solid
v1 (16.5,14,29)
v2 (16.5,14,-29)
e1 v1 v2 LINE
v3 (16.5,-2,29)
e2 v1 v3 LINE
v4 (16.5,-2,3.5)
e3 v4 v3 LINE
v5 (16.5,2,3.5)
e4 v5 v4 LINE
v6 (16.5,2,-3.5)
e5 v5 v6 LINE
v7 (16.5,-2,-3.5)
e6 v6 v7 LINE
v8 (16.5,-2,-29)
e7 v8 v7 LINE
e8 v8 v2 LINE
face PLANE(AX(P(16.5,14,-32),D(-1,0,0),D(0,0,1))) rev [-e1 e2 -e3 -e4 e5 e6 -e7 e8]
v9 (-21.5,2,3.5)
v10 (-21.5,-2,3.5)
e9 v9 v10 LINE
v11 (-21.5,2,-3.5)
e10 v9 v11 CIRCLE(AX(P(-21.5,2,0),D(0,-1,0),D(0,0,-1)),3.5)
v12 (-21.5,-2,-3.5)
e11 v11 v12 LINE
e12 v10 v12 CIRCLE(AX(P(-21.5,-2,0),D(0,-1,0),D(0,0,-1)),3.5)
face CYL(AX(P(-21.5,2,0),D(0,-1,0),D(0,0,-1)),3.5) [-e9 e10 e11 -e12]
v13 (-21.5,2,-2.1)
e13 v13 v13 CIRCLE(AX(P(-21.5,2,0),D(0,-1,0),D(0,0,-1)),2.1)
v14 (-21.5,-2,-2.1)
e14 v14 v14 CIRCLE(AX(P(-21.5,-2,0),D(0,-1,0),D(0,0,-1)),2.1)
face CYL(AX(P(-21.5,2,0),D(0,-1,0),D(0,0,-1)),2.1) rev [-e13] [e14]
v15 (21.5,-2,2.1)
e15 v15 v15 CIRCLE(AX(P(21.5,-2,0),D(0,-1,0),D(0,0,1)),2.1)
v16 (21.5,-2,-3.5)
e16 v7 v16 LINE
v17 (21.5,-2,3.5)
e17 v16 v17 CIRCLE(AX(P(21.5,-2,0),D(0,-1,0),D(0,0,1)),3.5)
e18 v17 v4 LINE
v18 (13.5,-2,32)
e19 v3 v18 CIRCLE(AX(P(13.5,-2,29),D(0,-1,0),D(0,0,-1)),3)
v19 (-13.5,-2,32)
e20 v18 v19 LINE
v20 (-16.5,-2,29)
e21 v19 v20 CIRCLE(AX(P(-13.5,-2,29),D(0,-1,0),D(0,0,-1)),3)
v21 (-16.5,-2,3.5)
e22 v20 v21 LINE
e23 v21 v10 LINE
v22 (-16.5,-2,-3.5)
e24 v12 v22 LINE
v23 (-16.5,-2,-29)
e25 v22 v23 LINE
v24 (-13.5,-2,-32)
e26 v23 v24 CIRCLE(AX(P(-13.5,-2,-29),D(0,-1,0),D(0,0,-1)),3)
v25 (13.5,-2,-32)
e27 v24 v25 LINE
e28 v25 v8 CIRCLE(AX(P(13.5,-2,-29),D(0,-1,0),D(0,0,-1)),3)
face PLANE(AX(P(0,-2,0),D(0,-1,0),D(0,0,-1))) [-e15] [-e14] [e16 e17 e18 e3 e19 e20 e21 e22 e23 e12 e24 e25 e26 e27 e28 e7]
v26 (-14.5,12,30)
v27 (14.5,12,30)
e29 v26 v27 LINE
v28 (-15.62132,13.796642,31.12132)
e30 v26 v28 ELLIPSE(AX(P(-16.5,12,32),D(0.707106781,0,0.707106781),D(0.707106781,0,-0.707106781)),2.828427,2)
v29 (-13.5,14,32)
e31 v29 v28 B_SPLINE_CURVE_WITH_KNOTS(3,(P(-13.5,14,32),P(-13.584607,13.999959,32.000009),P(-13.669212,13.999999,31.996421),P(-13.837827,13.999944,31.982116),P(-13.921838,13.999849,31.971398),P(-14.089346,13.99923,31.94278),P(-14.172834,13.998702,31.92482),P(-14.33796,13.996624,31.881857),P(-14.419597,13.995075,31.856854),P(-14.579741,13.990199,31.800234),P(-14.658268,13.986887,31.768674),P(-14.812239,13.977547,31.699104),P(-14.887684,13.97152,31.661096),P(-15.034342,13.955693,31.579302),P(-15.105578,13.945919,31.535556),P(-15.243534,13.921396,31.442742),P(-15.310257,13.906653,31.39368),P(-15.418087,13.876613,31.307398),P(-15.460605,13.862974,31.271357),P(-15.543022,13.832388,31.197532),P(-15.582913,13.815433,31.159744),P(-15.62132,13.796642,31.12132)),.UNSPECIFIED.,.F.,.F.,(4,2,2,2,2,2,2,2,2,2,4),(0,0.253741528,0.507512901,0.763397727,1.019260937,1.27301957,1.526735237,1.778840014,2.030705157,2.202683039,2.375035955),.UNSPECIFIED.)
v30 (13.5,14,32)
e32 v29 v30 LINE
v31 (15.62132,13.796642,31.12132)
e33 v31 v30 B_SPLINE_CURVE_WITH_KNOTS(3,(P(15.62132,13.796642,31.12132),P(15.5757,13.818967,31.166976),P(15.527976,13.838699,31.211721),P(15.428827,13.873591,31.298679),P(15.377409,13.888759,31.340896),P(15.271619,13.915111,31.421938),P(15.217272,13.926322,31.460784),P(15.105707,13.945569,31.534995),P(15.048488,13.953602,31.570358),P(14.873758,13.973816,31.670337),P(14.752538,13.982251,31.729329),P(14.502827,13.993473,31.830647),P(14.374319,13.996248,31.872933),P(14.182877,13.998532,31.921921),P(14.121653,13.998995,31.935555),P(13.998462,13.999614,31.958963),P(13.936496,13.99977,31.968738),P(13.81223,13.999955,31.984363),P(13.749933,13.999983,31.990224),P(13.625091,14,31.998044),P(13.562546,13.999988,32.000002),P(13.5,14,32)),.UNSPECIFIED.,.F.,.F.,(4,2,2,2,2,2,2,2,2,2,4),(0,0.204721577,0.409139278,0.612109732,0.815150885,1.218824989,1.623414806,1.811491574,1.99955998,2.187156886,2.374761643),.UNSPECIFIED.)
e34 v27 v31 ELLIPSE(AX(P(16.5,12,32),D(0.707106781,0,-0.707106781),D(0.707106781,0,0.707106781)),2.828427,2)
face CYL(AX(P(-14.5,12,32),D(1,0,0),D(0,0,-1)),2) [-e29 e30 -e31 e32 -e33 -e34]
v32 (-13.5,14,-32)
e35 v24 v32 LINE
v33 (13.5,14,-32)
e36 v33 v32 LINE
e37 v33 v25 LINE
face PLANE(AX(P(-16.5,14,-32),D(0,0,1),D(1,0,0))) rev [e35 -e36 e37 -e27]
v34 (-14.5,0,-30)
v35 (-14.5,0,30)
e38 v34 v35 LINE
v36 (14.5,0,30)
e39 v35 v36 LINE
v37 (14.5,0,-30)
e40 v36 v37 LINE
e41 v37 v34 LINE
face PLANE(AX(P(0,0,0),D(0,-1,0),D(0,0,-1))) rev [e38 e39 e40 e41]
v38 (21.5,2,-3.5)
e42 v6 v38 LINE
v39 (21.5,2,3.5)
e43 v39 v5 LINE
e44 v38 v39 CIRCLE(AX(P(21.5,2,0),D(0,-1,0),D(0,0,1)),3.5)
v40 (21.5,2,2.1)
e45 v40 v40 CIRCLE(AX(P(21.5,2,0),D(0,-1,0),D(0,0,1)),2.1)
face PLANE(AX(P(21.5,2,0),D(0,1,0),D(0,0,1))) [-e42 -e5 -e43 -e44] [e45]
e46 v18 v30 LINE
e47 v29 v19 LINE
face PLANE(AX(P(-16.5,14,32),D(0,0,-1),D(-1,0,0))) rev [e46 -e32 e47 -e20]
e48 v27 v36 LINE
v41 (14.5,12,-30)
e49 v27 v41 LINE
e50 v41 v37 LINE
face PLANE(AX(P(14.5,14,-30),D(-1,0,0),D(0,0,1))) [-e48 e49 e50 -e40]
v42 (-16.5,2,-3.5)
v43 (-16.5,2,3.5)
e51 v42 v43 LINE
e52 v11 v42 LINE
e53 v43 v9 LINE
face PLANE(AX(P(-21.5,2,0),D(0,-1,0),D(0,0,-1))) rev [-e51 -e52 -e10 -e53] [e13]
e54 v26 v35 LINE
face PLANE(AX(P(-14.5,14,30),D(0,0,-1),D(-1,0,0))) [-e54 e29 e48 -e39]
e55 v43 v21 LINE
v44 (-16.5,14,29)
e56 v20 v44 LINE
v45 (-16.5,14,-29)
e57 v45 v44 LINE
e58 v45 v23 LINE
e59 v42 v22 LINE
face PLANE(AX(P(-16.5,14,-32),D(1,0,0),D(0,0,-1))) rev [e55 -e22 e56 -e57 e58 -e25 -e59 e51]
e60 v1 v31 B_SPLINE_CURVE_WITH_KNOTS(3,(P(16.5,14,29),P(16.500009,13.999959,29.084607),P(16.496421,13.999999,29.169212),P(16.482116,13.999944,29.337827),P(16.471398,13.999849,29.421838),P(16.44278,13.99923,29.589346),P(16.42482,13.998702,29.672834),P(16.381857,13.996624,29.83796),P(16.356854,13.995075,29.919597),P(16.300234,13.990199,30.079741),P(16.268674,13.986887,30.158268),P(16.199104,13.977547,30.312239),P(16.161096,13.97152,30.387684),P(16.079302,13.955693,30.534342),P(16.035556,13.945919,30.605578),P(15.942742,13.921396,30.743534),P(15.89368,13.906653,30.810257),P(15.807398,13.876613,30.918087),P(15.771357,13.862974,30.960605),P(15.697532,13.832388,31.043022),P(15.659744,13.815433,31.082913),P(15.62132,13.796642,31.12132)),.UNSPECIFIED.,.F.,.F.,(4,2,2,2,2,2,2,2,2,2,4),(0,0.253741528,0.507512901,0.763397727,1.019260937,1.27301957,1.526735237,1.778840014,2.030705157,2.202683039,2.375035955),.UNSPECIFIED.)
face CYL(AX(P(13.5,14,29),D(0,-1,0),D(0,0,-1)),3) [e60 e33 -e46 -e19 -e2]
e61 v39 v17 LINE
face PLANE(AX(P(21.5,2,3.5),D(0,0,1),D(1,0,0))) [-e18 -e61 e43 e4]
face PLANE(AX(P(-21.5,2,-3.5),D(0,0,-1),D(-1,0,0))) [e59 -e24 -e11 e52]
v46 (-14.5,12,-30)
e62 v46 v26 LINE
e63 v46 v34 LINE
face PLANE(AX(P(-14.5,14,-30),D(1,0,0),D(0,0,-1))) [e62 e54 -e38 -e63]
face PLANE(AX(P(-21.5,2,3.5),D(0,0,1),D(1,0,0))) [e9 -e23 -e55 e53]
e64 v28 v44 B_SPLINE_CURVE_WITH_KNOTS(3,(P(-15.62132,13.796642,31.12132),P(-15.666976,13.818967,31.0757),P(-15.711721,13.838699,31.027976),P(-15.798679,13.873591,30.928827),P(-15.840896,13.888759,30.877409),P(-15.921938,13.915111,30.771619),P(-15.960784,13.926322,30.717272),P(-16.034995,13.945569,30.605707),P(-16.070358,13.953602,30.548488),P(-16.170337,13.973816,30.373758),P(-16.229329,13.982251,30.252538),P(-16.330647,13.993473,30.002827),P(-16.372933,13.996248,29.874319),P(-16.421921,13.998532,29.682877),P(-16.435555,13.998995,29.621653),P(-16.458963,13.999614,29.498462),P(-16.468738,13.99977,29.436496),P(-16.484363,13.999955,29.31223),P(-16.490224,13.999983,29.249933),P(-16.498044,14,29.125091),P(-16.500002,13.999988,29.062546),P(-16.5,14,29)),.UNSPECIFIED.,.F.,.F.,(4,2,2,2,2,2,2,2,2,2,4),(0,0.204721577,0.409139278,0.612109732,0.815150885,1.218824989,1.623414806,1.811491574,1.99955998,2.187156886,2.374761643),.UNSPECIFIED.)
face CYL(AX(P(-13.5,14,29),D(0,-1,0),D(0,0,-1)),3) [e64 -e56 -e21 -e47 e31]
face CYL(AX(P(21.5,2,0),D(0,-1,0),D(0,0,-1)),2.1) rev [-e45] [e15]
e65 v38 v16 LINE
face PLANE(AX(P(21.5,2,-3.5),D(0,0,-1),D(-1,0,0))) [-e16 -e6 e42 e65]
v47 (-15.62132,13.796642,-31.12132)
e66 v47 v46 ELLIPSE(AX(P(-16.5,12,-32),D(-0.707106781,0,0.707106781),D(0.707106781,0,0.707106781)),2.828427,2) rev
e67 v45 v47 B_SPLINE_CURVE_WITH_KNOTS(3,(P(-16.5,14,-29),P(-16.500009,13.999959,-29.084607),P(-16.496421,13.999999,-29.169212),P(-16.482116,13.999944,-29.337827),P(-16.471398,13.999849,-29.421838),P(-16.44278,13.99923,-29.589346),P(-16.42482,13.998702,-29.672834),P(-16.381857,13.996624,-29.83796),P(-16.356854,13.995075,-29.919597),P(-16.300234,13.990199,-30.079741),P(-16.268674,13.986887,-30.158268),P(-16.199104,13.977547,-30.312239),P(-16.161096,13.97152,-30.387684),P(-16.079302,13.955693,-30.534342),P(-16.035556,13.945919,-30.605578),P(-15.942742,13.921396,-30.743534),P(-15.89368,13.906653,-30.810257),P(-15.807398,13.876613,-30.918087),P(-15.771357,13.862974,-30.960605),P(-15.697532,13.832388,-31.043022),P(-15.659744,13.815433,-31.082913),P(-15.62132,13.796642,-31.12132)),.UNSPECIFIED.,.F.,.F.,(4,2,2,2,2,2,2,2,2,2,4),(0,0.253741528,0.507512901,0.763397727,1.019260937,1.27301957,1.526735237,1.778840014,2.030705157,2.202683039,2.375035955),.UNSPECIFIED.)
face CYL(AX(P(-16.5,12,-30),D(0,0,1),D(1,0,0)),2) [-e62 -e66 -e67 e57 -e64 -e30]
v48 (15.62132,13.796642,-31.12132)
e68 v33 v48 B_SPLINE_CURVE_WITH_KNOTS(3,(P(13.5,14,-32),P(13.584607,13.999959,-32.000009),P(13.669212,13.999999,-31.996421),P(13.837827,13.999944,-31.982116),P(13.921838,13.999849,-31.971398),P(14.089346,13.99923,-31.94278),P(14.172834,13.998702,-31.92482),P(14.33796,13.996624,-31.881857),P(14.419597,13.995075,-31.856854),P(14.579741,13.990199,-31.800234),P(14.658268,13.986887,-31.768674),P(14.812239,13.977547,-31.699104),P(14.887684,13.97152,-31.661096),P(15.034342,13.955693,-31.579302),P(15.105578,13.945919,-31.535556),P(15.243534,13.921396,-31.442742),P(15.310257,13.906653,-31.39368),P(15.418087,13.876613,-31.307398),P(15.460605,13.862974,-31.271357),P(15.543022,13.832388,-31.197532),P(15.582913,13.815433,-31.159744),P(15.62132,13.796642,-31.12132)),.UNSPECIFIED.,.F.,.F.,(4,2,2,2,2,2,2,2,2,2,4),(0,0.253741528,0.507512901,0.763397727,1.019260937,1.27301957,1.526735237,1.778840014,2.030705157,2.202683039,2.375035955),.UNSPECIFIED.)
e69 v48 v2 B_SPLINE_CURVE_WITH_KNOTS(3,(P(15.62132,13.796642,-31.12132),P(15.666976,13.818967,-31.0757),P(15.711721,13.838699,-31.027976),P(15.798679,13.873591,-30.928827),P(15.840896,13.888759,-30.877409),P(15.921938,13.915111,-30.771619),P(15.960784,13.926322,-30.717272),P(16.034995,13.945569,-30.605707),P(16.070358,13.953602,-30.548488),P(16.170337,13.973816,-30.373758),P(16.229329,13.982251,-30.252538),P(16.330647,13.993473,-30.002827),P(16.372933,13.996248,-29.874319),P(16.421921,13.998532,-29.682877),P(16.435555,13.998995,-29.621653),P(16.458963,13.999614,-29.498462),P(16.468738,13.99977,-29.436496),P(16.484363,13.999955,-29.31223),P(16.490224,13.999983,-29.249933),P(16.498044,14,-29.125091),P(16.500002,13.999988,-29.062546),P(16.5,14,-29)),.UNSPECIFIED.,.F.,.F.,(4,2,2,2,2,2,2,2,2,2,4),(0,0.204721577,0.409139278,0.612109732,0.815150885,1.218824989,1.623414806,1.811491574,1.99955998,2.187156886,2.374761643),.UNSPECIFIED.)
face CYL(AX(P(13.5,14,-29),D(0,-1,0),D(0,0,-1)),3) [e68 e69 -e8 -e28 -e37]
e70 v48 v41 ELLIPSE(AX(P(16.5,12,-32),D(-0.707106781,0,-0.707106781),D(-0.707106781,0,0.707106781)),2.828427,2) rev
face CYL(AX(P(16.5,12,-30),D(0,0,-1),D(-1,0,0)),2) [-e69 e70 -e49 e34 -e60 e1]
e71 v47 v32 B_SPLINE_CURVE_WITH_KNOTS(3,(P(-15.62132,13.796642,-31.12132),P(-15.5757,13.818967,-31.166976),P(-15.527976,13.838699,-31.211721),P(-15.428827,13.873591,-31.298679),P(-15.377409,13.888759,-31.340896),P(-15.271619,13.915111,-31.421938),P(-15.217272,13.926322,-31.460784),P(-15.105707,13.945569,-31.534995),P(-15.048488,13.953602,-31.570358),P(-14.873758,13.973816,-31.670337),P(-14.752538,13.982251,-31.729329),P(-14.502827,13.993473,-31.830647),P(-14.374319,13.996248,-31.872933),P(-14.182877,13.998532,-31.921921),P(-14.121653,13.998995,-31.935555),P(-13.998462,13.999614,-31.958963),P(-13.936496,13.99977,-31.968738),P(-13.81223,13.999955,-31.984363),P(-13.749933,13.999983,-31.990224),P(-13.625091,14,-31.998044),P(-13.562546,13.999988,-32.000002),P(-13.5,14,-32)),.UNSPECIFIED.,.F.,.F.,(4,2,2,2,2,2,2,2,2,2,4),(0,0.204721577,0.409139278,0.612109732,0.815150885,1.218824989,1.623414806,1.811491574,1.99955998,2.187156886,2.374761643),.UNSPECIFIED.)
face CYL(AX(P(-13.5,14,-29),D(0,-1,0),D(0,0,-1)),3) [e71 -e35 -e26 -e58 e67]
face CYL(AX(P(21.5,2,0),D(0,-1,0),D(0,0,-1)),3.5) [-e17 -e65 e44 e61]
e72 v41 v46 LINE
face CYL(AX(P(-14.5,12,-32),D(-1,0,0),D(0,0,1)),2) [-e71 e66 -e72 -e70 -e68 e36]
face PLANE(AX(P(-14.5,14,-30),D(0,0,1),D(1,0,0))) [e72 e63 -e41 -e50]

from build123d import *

# Parameters (mm, degrees)
SKETCH2_W           = 33
SKETCH2_H           = 64
SKETCH2_W_2         = 29
SKETCH2_H_2         = 60
BOSS_EXTRUDE1_DEPTH = 14
SKETCH3_W           = 33
SKETCH3_H           = 64
BOSS_EXTRUDE2_DEPTH = 2
SKETCH4_R           = 2.1
BOSS_EXTRUDE3_DEPTH = 4
FILLET1_R           = 3
FILLET2_R           = 2


with BuildPart() as part:
    # Sketch2 → Boss-Extrude1 (new body)
    with BuildSketch(Plane(origin=(0, 0, 0), x_dir=(1, 0, 0), z_dir=(0, 1, 0))):
        Rectangle(SKETCH2_W, SKETCH2_H)
        Rectangle(SKETCH2_W_2, SKETCH2_H_2, mode=Mode.SUBTRACT)
    extrude(amount=BOSS_EXTRUDE1_DEPTH)

    # Sketch3 → Boss-Extrude2 (add)
    with BuildSketch(Plane.XZ):
        Rectangle(SKETCH3_W, SKETCH3_H)
    extrude(amount=BOSS_EXTRUDE2_DEPTH)

    # Sketch4 → Boss-Extrude3 (add)
    # profile 1 of 2: a face of its own
    with BuildSketch(Plane.XZ.offset(2)):
        with BuildLine():
            Line((-21.5, 3.5), (-16.5, 3.5))
            Line((-16.5, 3.5), (-16.5, -3.5))
            Line((-16.5, -3.5), (-21.5, -3.5))
            ThreePointArc((-21.5, -3.5), (-25, 0), (-21.5, 3.5))
        make_face()
        with Locations(Location((-21.5, 0, 0), (0, 0, 270))):
            Circle(SKETCH4_R, mode=Mode.SUBTRACT)
    # profile 2 of 2: a face of its own
    with BuildSketch(Plane.XZ.offset(2)):
        with BuildLine():
            Line((16.5, 3.5), (16.5, -3.5))
            Line((16.5, -3.5), (21.5, -3.5))
            ThreePointArc((21.5, -3.5), (25, 0), (21.5, 3.5))
            Line((21.5, 3.5), (16.5, 3.5))
        make_face()
        with Locations(Location((21.5, 0, 0), (0, 0, 90))):
            Circle(SKETCH4_R, mode=Mode.SUBTRACT)
    extrude(amount=-BOSS_EXTRUDE3_DEPTH)

    # Fillet1
    fillet1_edges = [part.edges().sort_by_distance(p)[0] for p in [
        (16.5, 6, 32),
        (-16.5, 6, 32),
        (-16.5, 6, -32),
        (16.5, 6, -32),
    ]]
    fillet(fillet1_edges, radius=FILLET1_R)

    # Fillet2
    # the kernel refuses this fillet: 2 mm, written as the material it takes off along each edge
    with BuildSketch(Plane(origin=(14.5, 14, -30), x_dir=(1, 0, 0), z_dir=(0, 0, 1)), Plane(origin=(-14.5, 14, 30), x_dir=(-1, 0, 0), z_dir=(0, 0, -1))) as fillet2_piece_1:
        with BuildLine():
            CenterArc((FILLET2_R, -FILLET2_R), FILLET2_R, 90, 90)
            Line((0, -FILLET2_R), (-FILLET2_R * 0.02, -FILLET2_R))
            Line((-FILLET2_R * 0.02, -FILLET2_R), (-FILLET2_R * 0.02, FILLET2_R * 0.02))
            Line((-FILLET2_R * 0.02, FILLET2_R * 0.02), (FILLET2_R, FILLET2_R * 0.02))
            Line((FILLET2_R, FILLET2_R * 0.02), (FILLET2_R, 0))
        make_face()
    extrude(amount=60, mode=Mode.SUBTRACT)
    with BuildSketch(Plane(origin=(-14.5, 14, -30), x_dir=(0, 0, -1), z_dir=(1, 0, 0)), Plane(origin=(14.5, 14, 30), x_dir=(0, 0, 1), z_dir=(-1, 0, 0))) as fillet2_piece_2:
        with BuildLine():
            CenterArc((FILLET2_R, -FILLET2_R), FILLET2_R, 90, 90)
            Line((0, -FILLET2_R), (-FILLET2_R * 0.02, -FILLET2_R))
            Line((-FILLET2_R * 0.02, -FILLET2_R), (-FILLET2_R * 0.02, FILLET2_R * 0.02))
            Line((-FILLET2_R * 0.02, FILLET2_R * 0.02), (FILLET2_R, FILLET2_R * 0.02))
            Line((FILLET2_R, FILLET2_R * 0.02), (FILLET2_R, 0))
        make_face()
    extrude(amount=29, mode=Mode.SUBTRACT)
    with BuildSketch(Plane(origin=(14.5, 14, -35), x_dir=(1, 0, 0), z_dir=(0, 0, 1))) as fillet2_piece_3a_section:
        with BuildLine():
            CenterArc((FILLET2_R, -FILLET2_R), FILLET2_R, 90, 90)
            Line((0, -FILLET2_R), (-FILLET2_R * 0.02, -FILLET2_R))
            Line((-FILLET2_R * 0.02, -FILLET2_R), (-FILLET2_R * 0.02, FILLET2_R * 0.02))
            Line((-FILLET2_R * 0.02, FILLET2_R * 0.02), (FILLET2_R, FILLET2_R * 0.02))
            Line((FILLET2_R, FILLET2_R * 0.02), (FILLET2_R, 0))
        make_face()
    fillet2_piece_3a = extrude(amount=65, mode=Mode.PRIVATE)
    fillet2_piece_3a = split(fillet2_piece_3a, bisect_by=Plane(origin=(14.952790229, 13.547209771, -30), z_dir=(0, 0, -1)), keep=Keep.TOP, mode=Mode.PRIVATE)
    with BuildSketch(Plane(origin=(-14.5, 14, -30), x_dir=(0, 0, -1), z_dir=(1, 0, 0))) as fillet2_piece_3b_section:
        with BuildLine():
            CenterArc((FILLET2_R, -FILLET2_R), FILLET2_R, 90, 90)
            Line((0, -FILLET2_R), (-FILLET2_R * 0.02, -FILLET2_R))
            Line((-FILLET2_R * 0.02, -FILLET2_R), (-FILLET2_R * 0.02, FILLET2_R * 0.02))
            Line((-FILLET2_R * 0.02, FILLET2_R * 0.02), (FILLET2_R, FILLET2_R * 0.02))
            Line((FILLET2_R, FILLET2_R * 0.02), (FILLET2_R, 0))
        make_face()
    fillet2_piece_3b = extrude(amount=34, mode=Mode.PRIVATE)
    fillet2_piece_3b = split(fillet2_piece_3b, bisect_by=Plane(origin=(14.5, 13.547209771, -30.452790229), z_dir=(1, 0, 0)), keep=Keep.TOP, mode=Mode.PRIVATE)
    fillet2_piece_3 = fillet2_piece_3a & fillet2_piece_3b
    add(fillet2_piece_3, mode=Mode.SUBTRACT)
    with BuildSketch(Plane(origin=(19.5, 14, 30), x_dir=(0, 0, 1), z_dir=(-1, 0, 0))) as fillet2_piece_4a_section:
        with BuildLine():
            CenterArc((FILLET2_R, -FILLET2_R), FILLET2_R, 90, 90)
            Line((0, -FILLET2_R), (-FILLET2_R * 0.02, -FILLET2_R))
            Line((-FILLET2_R * 0.02, -FILLET2_R), (-FILLET2_R * 0.02, FILLET2_R * 0.02))
            Line((-FILLET2_R * 0.02, FILLET2_R * 0.02), (FILLET2_R, FILLET2_R * 0.02))
            Line((FILLET2_R, FILLET2_R * 0.02), (FILLET2_R, 0))
        make_face()
    fillet2_piece_4a = extrude(amount=34, mode=Mode.PRIVATE)
    fillet2_piece_4a = split(fillet2_piece_4a, bisect_by=Plane(origin=(14.5, 13.547209771, 30.452790229), z_dir=(1, 0, 0)), keep=Keep.TOP, mode=Mode.PRIVATE)
    with BuildSketch(Plane(origin=(14.5, 14, -30), x_dir=(1, 0, 0), z_dir=(0, 0, 1))) as fillet2_piece_4b_section:
        with BuildLine():
            CenterArc((FILLET2_R, -FILLET2_R), FILLET2_R, 90, 90)
            Line((0, -FILLET2_R), (-FILLET2_R * 0.02, -FILLET2_R))
            Line((-FILLET2_R * 0.02, -FILLET2_R), (-FILLET2_R * 0.02, FILLET2_R * 0.02))
            Line((-FILLET2_R * 0.02, FILLET2_R * 0.02), (FILLET2_R, FILLET2_R * 0.02))
            Line((FILLET2_R, FILLET2_R * 0.02), (FILLET2_R, 0))
        make_face()
    fillet2_piece_4b = extrude(amount=65, mode=Mode.PRIVATE)
    fillet2_piece_4b = split(fillet2_piece_4b, bisect_by=Plane(origin=(14.952790229, 13.547209771, 30), z_dir=(0, 0, 1)), keep=Keep.TOP, mode=Mode.PRIVATE)
    fillet2_piece_4 = fillet2_piece_4a & fillet2_piece_4b
    add(fillet2_piece_4, mode=Mode.SUBTRACT)
    with BuildSketch(Plane(origin=(-14.5, 14, 30), x_dir=(-1, 0, 0), z_dir=(0, 0, -1))) as fillet2_piece_5a_section:
        with BuildLine():
            CenterArc((FILLET2_R, -FILLET2_R), FILLET2_R, 90, 90)
            Line((0, -FILLET2_R), (-FILLET2_R * 0.02, -FILLET2_R))
            Line((-FILLET2_R * 0.02, -FILLET2_R), (-FILLET2_R * 0.02, FILLET2_R * 0.02))
            Line((-FILLET2_R * 0.02, FILLET2_R * 0.02), (FILLET2_R, FILLET2_R * 0.02))
            Line((FILLET2_R, FILLET2_R * 0.02), (FILLET2_R, 0))
        make_face()
    fillet2_piece_5a = extrude(amount=65, mode=Mode.PRIVATE)
    fillet2_piece_5a = split(fillet2_piece_5a, bisect_by=Plane(origin=(-14.952790229, 13.547209771, -30), z_dir=(0, 0, -1)), keep=Keep.TOP, mode=Mode.PRIVATE)
    with BuildSketch(Plane(origin=(-19.5, 14, -30), x_dir=(0, 0, -1), z_dir=(1, 0, 0))) as fillet2_piece_5b_section:
        with BuildLine():
            CenterArc((FILLET2_R, -FILLET2_R), FILLET2_R, 90, 90)
            Line((0, -FILLET2_R), (-FILLET2_R * 0.02, -FILLET2_R))
            Line((-FILLET2_R * 0.02, -FILLET2_R), (-FILLET2_R * 0.02, FILLET2_R * 0.02))
            Line((-FILLET2_R * 0.02, FILLET2_R * 0.02), (FILLET2_R, FILLET2_R * 0.02))
            Line((FILLET2_R, FILLET2_R * 0.02), (FILLET2_R, 0))
        make_face()
    fillet2_piece_5b = extrude(amount=34, mode=Mode.PRIVATE)
    fillet2_piece_5b = split(fillet2_piece_5b, bisect_by=Plane(origin=(-14.5, 13.547209771, -30.452790229), z_dir=(-1, 0, 0)), keep=Keep.TOP, mode=Mode.PRIVATE)
    fillet2_piece_5 = fillet2_piece_5a & fillet2_piece_5b
    add(fillet2_piece_5, mode=Mode.SUBTRACT)
    with BuildSketch(Plane(origin=(-14.5, 14, 35), x_dir=(-1, 0, 0), z_dir=(0, 0, -1))) as fillet2_piece_6a_section:
        with BuildLine():
            CenterArc((FILLET2_R, -FILLET2_R), FILLET2_R, 90, 90)
            Line((0, -FILLET2_R), (-FILLET2_R * 0.02, -FILLET2_R))
            Line((-FILLET2_R * 0.02, -FILLET2_R), (-FILLET2_R * 0.02, FILLET2_R * 0.02))
            Line((-FILLET2_R * 0.02, FILLET2_R * 0.02), (FILLET2_R, FILLET2_R * 0.02))
            Line((FILLET2_R, FILLET2_R * 0.02), (FILLET2_R, 0))
        make_face()
    fillet2_piece_6a = extrude(amount=65, mode=Mode.PRIVATE)
    fillet2_piece_6a = split(fillet2_piece_6a, bisect_by=Plane(origin=(-14.952790229, 13.547209771, 30), z_dir=(0, 0, 1)), keep=Keep.TOP, mode=Mode.PRIVATE)
    with BuildSketch(Plane(origin=(14.5, 14, 30), x_dir=(0, 0, 1), z_dir=(-1, 0, 0))) as fillet2_piece_6b_section:
        with BuildLine():
            CenterArc((FILLET2_R, -FILLET2_R), FILLET2_R, 90, 90)
            Line((0, -FILLET2_R), (-FILLET2_R * 0.02, -FILLET2_R))
            Line((-FILLET2_R * 0.02, -FILLET2_R), (-FILLET2_R * 0.02, FILLET2_R * 0.02))
            Line((-FILLET2_R * 0.02, FILLET2_R * 0.02), (FILLET2_R, FILLET2_R * 0.02))
            Line((FILLET2_R, FILLET2_R * 0.02), (FILLET2_R, 0))
        make_face()
    fillet2_piece_6b = extrude(amount=34, mode=Mode.PRIVATE)
    fillet2_piece_6b = split(fillet2_piece_6b, bisect_by=Plane(origin=(-14.5, 13.547209771, 30.452790229), z_dir=(-1, 0, 0)), keep=Keep.TOP, mode=Mode.PRIVATE)
    fillet2_piece_6 = fillet2_piece_6a & fillet2_piece_6b
    add(fillet2_piece_6, mode=Mode.SUBTRACT)


solid = part.part
